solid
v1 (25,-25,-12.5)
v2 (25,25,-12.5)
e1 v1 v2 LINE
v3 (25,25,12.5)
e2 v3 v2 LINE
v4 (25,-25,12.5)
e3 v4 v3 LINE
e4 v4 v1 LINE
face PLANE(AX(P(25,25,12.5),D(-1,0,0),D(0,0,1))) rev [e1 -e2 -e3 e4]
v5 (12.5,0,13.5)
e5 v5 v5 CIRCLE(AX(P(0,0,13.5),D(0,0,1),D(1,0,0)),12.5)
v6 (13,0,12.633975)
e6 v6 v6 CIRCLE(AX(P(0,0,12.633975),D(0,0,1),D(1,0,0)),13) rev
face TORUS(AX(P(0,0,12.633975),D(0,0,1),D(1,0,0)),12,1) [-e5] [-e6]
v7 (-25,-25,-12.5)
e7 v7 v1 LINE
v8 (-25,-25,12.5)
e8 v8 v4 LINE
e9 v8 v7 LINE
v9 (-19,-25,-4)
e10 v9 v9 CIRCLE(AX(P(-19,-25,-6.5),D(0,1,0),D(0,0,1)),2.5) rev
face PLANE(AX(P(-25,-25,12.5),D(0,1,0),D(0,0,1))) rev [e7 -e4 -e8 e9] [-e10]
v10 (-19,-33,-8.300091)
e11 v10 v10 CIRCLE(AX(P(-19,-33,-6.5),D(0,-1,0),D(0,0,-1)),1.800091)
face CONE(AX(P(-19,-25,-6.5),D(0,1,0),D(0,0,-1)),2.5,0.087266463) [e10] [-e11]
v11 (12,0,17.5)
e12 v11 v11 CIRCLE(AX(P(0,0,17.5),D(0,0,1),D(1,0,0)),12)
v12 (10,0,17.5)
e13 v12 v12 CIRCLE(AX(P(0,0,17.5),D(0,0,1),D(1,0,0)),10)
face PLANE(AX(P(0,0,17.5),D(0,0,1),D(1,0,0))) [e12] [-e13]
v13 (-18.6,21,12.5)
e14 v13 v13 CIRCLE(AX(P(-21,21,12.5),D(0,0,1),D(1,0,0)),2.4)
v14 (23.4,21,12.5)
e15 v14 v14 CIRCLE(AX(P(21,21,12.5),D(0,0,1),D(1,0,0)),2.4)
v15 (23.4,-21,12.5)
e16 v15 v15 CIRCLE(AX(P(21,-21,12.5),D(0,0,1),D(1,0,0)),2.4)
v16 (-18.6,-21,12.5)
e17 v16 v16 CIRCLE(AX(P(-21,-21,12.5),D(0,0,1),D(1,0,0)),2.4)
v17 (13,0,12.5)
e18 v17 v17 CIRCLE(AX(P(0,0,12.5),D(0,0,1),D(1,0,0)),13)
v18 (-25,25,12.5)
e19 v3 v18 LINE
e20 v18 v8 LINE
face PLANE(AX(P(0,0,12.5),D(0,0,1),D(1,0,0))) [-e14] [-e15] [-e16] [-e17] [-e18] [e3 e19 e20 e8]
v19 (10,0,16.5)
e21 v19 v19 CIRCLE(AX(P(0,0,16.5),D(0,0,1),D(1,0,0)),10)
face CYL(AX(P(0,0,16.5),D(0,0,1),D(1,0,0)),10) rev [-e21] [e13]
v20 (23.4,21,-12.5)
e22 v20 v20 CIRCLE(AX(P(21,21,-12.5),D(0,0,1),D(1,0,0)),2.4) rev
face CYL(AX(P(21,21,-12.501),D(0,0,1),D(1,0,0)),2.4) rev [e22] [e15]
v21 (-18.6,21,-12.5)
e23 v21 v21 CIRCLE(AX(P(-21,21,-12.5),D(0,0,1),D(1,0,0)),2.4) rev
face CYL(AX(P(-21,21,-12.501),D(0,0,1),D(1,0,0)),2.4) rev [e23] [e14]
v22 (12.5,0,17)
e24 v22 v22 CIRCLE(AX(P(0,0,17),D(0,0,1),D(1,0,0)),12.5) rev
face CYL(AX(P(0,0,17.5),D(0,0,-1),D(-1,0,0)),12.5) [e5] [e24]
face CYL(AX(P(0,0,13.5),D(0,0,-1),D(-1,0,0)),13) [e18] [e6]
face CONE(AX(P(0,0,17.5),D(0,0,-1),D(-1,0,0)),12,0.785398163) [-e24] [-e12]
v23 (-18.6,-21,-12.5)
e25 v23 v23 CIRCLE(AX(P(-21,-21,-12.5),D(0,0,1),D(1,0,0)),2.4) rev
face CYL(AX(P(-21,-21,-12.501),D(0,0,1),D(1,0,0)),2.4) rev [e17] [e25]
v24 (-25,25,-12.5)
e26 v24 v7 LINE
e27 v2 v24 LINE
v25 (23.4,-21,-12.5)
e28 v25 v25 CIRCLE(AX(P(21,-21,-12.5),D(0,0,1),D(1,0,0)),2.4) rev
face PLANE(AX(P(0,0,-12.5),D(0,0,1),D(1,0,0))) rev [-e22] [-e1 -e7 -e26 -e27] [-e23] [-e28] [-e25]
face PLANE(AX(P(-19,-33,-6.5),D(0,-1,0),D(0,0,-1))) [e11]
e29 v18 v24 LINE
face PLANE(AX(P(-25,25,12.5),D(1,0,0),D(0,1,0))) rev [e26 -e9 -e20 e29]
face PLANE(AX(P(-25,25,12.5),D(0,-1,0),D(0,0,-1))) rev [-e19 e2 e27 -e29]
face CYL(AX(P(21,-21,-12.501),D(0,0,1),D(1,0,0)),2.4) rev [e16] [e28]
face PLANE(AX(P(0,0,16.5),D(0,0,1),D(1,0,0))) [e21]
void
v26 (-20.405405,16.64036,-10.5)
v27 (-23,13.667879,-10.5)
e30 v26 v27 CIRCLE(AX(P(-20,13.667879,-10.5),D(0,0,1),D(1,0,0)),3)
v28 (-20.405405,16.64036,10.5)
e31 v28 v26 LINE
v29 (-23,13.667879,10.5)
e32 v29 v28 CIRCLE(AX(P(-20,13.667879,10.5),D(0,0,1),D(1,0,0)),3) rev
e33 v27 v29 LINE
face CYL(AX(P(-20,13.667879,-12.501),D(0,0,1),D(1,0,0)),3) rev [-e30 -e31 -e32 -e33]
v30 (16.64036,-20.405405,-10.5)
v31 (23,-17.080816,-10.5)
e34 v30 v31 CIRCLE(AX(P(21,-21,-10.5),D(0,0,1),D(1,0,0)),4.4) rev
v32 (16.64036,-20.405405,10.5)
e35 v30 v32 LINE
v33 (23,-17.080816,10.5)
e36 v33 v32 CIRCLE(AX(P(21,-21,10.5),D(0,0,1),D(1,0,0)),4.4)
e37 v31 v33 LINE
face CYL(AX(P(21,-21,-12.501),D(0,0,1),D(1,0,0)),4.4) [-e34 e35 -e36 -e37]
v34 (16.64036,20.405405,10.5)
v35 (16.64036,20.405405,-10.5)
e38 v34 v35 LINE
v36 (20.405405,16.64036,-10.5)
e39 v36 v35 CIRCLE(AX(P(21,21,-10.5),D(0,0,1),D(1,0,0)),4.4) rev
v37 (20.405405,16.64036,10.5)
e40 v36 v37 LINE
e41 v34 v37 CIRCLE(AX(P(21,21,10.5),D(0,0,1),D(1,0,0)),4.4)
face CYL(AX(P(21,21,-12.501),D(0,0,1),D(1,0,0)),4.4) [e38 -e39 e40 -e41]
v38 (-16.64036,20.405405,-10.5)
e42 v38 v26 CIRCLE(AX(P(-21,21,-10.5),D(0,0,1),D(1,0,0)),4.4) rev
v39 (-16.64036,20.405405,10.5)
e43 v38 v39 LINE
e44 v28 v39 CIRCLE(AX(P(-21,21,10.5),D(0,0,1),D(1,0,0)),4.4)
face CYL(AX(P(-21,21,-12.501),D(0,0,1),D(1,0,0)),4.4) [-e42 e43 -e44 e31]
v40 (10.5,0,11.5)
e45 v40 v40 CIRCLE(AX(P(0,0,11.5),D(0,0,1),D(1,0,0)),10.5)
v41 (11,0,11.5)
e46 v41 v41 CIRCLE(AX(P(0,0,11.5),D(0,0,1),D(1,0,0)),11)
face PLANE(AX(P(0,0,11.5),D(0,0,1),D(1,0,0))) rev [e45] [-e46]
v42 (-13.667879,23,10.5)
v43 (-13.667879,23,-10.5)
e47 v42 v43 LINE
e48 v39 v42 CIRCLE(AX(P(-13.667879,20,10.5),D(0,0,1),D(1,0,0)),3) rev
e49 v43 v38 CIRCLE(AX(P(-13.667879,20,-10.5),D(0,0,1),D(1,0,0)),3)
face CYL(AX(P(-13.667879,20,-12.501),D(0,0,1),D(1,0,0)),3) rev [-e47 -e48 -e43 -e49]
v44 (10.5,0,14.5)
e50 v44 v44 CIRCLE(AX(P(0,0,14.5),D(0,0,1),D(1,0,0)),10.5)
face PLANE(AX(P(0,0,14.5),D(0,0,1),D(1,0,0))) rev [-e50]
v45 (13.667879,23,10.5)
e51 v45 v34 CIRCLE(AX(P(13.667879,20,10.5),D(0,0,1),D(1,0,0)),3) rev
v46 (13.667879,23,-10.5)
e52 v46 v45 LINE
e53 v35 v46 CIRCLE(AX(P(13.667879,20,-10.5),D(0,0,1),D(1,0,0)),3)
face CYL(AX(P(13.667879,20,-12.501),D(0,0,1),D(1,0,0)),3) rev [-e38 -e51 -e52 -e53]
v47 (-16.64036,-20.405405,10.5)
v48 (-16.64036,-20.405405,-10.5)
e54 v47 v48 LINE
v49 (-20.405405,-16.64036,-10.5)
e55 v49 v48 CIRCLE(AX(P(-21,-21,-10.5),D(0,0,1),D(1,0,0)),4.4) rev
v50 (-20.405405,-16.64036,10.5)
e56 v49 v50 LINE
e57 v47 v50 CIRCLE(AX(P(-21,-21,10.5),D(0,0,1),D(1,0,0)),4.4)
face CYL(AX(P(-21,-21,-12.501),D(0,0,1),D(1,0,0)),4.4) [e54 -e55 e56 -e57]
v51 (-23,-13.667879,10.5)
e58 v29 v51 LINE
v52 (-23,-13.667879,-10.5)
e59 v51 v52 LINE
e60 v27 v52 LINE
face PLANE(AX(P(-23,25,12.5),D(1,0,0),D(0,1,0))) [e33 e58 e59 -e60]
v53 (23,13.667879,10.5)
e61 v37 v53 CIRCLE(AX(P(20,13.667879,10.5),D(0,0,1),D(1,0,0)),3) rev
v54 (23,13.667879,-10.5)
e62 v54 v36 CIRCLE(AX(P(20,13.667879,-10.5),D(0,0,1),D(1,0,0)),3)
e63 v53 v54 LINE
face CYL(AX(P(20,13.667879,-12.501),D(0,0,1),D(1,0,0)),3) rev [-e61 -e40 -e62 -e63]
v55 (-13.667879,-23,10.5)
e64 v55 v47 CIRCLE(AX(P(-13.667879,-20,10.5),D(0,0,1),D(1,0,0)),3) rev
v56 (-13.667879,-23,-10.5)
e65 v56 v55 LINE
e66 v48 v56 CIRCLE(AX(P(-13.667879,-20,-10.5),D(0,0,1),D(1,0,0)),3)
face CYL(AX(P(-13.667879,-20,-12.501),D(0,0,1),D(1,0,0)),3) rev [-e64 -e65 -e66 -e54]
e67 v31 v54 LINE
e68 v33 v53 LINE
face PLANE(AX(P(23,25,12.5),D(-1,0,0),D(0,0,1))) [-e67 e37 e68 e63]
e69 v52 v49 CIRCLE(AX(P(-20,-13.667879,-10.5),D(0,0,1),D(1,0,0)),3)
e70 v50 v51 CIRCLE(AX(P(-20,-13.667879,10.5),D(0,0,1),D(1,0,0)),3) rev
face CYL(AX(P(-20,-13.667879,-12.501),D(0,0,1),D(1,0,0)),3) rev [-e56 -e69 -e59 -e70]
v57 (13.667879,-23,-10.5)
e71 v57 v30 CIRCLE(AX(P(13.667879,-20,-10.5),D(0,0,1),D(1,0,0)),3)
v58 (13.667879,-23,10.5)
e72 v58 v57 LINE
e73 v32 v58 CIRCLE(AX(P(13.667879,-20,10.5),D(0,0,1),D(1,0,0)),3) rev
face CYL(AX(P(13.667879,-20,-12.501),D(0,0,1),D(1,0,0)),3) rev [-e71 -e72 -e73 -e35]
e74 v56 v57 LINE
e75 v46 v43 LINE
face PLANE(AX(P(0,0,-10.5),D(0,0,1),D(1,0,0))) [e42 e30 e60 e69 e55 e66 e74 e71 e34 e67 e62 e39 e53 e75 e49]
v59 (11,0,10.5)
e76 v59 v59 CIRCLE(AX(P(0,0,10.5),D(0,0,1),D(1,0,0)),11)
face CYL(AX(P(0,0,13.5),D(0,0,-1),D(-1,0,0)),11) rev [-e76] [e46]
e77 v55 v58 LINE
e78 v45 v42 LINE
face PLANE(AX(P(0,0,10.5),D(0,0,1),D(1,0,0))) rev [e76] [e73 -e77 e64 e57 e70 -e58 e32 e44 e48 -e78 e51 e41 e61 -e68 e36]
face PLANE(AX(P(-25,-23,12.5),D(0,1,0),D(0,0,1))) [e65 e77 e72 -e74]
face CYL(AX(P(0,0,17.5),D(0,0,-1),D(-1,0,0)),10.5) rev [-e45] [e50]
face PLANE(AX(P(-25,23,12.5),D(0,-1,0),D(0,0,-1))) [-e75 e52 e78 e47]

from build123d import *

# Parameters (mm, degrees)
SKETCH1_W            = 50
SKETCH1_H            = 50
BOSS_EXTRUDE1_DEPTH  = 12.5
SKETCH2_R            = 12.5
BOSS_EXTRUDE2_DEPTH  = 5
CUT_EXTRUDE1_REACH   = 45.301
SKETCH4_R            = 2.4
SKETCH5_R            = 13
BOSS_EXTRUDE3_DEPTH  = 1
SHELL1_START         = -10.5
SHELL1_DEPTH         = 21
SHELL1_START_2       = 10.5
SHELL1_2_OUTLINE_R   = 10.5
SHELL1_2_DEPTH       = 4
SHELL1_3_OUTLINE_R   = 11
SHELL1_3_OUTLINE_R_2 = 10.5
SHELL1_3_DEPTH       = 1
FILLET1_R            = 3
SKETCH6_R            = 10
CUT_EXTRUDE2_DEPTH   = 1
FILLET2_R            = 1
CHAMFER1_SIZE        = 0.5
SKETCH7_R            = 2.5
BOSS_EXTRUDE4_DEPTH  = 8
BOSS_EXTRUDE4_TAPER  = 5


# Read off the part's stored shape, not the designer's step: Shell1
with BuildPart() as part:
    # Sketch1 → Boss-Extrude1 (new, symmetric)
    with BuildSketch(Plane.XY):
        Rectangle(SKETCH1_W, SKETCH1_H)
    extrude(amount=BOSS_EXTRUDE1_DEPTH, both=True)

    # Sketch2 → Boss-Extrude2 (add)
    with BuildSketch(Plane.XY.offset(12.5)):
        Circle(SKETCH2_R)
    extrude(amount=BOSS_EXTRUDE2_DEPTH)

    # Sketch4 → Cut-Extrude1 (cut, up to next)
    with BuildSketch(Plane.XY.offset(12.5), mode=Mode.PRIVATE) as cut_extrude1_sk1:
        with Locations((-21, 21)):
            Circle(SKETCH4_R)
    cut_extrude1_tool1 = extrude(cut_extrude1_sk1.sketch, amount=-CUT_EXTRUDE1_REACH, mode=Mode.PRIVATE) & part.part
    # Sketch4 → Cut-Extrude1 (cut, up to next)
    with BuildSketch(Plane.XY.offset(12.5), mode=Mode.PRIVATE) as cut_extrude1_sk2:
        with Locations((21, 21)):
            Circle(SKETCH4_R)
    cut_extrude1_tool2 = extrude(cut_extrude1_sk2.sketch, amount=-CUT_EXTRUDE1_REACH, mode=Mode.PRIVATE) & part.part
    # Sketch4 → Cut-Extrude1 (cut, up to next)
    with BuildSketch(Plane.XY.offset(12.5), mode=Mode.PRIVATE) as cut_extrude1_sk3:
        with Locations((-21, -21)):
            Circle(SKETCH4_R)
    cut_extrude1_tool3 = extrude(cut_extrude1_sk3.sketch, amount=-CUT_EXTRUDE1_REACH, mode=Mode.PRIVATE) & part.part
    # Sketch4 → Cut-Extrude1 (cut, up to next)
    with BuildSketch(Plane.XY.offset(12.5), mode=Mode.PRIVATE) as cut_extrude1_sk4:
        with Locations((21, -21)):
            Circle(SKETCH4_R)
    cut_extrude1_tool4 = extrude(cut_extrude1_sk4.sketch, amount=-CUT_EXTRUDE1_REACH, mode=Mode.PRIVATE) & part.part
    add(cut_extrude1_tool1.solids().sort_by_distance((-21, 21, 12.5))[0], mode=Mode.SUBTRACT)
    add(cut_extrude1_tool2.solids().sort_by_distance((21, 21, 12.5))[0], mode=Mode.SUBTRACT)
    add(cut_extrude1_tool3.solids().sort_by_distance((-21, -21, 12.5))[0], mode=Mode.SUBTRACT)
    add(cut_extrude1_tool4.solids().sort_by_distance((21, -21, 12.5))[0], mode=Mode.SUBTRACT)

    # Sketch5 → Boss-Extrude3 (add)
    with BuildSketch(Plane.XY.offset(12.5)):
        Circle(SKETCH5_R)
    extrude(amount=BOSS_EXTRUDE3_DEPTH)

    # Shell1 outline → Shell1 (cut)
    with BuildSketch(Plane.XY.offset(SHELL1_START)):
        with BuildLine():
            Line((23, -17.080816412), (23, 17.080816412))
            ThreePointArc((23, 17.080816412), (17.888730163, 17.888730163), (17.080816412, 23))
            Line((17.080816412, 23), (-17.080816412, 23))
            ThreePointArc((-17.080816412, 23), (-17.888730163, 17.888730163), (-23, 17.080816412))
            Line((-23, 17.080816412), (-23, -17.080816412))
            ThreePointArc((-23, -17.080816412), (-17.888730163, -17.888730163), (-17.080816412, -23))
            Line((-17.080816412, -23), (17.080816412, -23))
            ThreePointArc((17.080816412, -23), (17.888730163, -17.888730163), (23, -17.080816412))
        make_face()
    extrude(amount=SHELL1_DEPTH, mode=Mode.SUBTRACT)

    # Shell1 2 outline → Shell1 2 (cut)
    with BuildSketch(Plane.XY.offset(SHELL1_START_2)):
        Circle(SHELL1_2_OUTLINE_R)
    extrude(amount=SHELL1_2_DEPTH, mode=Mode.SUBTRACT)

    # Shell1 3 outline → Shell1 3 (cut)
    with BuildSketch(Plane.XY.offset(SHELL1_START_2)):
        Circle(SHELL1_3_OUTLINE_R)
        Circle(SHELL1_3_OUTLINE_R_2, mode=Mode.SUBTRACT)
    extrude(amount=SHELL1_3_DEPTH, mode=Mode.SUBTRACT)

    # Fillet1
    fillet1_edges = [part.edges().sort_by_distance(p)[0] for p in [
        (23, 17.080816412, 0),
        (-17.080816412, 23, 0),
        (-23, -17.080816412, 0),
        (17.080816412, -23, 0),
        (-23, 17.080816412, 0),
        (-17.080816412, -23, 0),
        (17.080816412, 23, 0),
    ]]
    fillet(fillet1_edges, radius=FILLET1_R)

    # Sketch6 → Cut-Extrude2 (cut)
    with BuildSketch(Plane.XY.offset(17.5)):
        Circle(SKETCH6_R)
    extrude(amount=-CUT_EXTRUDE2_DEPTH, mode=Mode.SUBTRACT)

    # Fillet2
    # the kernel refuses this fillet: 1 mm, written as the material it takes off along each edge
    with BuildSketch(Plane(origin=(0, 0, 13.5), x_dir=(1, 0, 0), z_dir=(0, -1, 0))) as fillet2_piece_1:
        with BuildLine():
            CenterArc((12, -0.866025404), FILLET2_R, 0, 60)
            Line((12.5, 0), (12.51, 0.017320508))
            ThreePointArc((12.51, 0.017320508), (12.75, 0.02), (13, 0.02))
            Line((13, 0.02), (13.02, 0))
            Line((13.02, 0), (13.02, -0.866025404))
            Line((13.02, -0.866025404), (13, -0.866025404))
        make_face()
    revolve(axis=Axis((0, 0, 13.5), (0, 0, 1)), mode=Mode.SUBTRACT)

    # Chamfer1
    chamfer1_edges = [part.edges().sort_by_distance(p)[0] for p in [
        (-12.5, 0, 17.5),
    ]]
    chamfer(chamfer1_edges, length=CHAMFER1_SIZE)

    # Sketch7 → Boss-Extrude4 (add)
    with BuildSketch(Plane.XZ.offset(25)):
        with Locations((-19, -6.5)):
            Circle(SKETCH7_R)
    extrude(amount=BOSS_EXTRUDE4_DEPTH, taper=BOSS_EXTRUDE4_TAPER)


solid = part.part
